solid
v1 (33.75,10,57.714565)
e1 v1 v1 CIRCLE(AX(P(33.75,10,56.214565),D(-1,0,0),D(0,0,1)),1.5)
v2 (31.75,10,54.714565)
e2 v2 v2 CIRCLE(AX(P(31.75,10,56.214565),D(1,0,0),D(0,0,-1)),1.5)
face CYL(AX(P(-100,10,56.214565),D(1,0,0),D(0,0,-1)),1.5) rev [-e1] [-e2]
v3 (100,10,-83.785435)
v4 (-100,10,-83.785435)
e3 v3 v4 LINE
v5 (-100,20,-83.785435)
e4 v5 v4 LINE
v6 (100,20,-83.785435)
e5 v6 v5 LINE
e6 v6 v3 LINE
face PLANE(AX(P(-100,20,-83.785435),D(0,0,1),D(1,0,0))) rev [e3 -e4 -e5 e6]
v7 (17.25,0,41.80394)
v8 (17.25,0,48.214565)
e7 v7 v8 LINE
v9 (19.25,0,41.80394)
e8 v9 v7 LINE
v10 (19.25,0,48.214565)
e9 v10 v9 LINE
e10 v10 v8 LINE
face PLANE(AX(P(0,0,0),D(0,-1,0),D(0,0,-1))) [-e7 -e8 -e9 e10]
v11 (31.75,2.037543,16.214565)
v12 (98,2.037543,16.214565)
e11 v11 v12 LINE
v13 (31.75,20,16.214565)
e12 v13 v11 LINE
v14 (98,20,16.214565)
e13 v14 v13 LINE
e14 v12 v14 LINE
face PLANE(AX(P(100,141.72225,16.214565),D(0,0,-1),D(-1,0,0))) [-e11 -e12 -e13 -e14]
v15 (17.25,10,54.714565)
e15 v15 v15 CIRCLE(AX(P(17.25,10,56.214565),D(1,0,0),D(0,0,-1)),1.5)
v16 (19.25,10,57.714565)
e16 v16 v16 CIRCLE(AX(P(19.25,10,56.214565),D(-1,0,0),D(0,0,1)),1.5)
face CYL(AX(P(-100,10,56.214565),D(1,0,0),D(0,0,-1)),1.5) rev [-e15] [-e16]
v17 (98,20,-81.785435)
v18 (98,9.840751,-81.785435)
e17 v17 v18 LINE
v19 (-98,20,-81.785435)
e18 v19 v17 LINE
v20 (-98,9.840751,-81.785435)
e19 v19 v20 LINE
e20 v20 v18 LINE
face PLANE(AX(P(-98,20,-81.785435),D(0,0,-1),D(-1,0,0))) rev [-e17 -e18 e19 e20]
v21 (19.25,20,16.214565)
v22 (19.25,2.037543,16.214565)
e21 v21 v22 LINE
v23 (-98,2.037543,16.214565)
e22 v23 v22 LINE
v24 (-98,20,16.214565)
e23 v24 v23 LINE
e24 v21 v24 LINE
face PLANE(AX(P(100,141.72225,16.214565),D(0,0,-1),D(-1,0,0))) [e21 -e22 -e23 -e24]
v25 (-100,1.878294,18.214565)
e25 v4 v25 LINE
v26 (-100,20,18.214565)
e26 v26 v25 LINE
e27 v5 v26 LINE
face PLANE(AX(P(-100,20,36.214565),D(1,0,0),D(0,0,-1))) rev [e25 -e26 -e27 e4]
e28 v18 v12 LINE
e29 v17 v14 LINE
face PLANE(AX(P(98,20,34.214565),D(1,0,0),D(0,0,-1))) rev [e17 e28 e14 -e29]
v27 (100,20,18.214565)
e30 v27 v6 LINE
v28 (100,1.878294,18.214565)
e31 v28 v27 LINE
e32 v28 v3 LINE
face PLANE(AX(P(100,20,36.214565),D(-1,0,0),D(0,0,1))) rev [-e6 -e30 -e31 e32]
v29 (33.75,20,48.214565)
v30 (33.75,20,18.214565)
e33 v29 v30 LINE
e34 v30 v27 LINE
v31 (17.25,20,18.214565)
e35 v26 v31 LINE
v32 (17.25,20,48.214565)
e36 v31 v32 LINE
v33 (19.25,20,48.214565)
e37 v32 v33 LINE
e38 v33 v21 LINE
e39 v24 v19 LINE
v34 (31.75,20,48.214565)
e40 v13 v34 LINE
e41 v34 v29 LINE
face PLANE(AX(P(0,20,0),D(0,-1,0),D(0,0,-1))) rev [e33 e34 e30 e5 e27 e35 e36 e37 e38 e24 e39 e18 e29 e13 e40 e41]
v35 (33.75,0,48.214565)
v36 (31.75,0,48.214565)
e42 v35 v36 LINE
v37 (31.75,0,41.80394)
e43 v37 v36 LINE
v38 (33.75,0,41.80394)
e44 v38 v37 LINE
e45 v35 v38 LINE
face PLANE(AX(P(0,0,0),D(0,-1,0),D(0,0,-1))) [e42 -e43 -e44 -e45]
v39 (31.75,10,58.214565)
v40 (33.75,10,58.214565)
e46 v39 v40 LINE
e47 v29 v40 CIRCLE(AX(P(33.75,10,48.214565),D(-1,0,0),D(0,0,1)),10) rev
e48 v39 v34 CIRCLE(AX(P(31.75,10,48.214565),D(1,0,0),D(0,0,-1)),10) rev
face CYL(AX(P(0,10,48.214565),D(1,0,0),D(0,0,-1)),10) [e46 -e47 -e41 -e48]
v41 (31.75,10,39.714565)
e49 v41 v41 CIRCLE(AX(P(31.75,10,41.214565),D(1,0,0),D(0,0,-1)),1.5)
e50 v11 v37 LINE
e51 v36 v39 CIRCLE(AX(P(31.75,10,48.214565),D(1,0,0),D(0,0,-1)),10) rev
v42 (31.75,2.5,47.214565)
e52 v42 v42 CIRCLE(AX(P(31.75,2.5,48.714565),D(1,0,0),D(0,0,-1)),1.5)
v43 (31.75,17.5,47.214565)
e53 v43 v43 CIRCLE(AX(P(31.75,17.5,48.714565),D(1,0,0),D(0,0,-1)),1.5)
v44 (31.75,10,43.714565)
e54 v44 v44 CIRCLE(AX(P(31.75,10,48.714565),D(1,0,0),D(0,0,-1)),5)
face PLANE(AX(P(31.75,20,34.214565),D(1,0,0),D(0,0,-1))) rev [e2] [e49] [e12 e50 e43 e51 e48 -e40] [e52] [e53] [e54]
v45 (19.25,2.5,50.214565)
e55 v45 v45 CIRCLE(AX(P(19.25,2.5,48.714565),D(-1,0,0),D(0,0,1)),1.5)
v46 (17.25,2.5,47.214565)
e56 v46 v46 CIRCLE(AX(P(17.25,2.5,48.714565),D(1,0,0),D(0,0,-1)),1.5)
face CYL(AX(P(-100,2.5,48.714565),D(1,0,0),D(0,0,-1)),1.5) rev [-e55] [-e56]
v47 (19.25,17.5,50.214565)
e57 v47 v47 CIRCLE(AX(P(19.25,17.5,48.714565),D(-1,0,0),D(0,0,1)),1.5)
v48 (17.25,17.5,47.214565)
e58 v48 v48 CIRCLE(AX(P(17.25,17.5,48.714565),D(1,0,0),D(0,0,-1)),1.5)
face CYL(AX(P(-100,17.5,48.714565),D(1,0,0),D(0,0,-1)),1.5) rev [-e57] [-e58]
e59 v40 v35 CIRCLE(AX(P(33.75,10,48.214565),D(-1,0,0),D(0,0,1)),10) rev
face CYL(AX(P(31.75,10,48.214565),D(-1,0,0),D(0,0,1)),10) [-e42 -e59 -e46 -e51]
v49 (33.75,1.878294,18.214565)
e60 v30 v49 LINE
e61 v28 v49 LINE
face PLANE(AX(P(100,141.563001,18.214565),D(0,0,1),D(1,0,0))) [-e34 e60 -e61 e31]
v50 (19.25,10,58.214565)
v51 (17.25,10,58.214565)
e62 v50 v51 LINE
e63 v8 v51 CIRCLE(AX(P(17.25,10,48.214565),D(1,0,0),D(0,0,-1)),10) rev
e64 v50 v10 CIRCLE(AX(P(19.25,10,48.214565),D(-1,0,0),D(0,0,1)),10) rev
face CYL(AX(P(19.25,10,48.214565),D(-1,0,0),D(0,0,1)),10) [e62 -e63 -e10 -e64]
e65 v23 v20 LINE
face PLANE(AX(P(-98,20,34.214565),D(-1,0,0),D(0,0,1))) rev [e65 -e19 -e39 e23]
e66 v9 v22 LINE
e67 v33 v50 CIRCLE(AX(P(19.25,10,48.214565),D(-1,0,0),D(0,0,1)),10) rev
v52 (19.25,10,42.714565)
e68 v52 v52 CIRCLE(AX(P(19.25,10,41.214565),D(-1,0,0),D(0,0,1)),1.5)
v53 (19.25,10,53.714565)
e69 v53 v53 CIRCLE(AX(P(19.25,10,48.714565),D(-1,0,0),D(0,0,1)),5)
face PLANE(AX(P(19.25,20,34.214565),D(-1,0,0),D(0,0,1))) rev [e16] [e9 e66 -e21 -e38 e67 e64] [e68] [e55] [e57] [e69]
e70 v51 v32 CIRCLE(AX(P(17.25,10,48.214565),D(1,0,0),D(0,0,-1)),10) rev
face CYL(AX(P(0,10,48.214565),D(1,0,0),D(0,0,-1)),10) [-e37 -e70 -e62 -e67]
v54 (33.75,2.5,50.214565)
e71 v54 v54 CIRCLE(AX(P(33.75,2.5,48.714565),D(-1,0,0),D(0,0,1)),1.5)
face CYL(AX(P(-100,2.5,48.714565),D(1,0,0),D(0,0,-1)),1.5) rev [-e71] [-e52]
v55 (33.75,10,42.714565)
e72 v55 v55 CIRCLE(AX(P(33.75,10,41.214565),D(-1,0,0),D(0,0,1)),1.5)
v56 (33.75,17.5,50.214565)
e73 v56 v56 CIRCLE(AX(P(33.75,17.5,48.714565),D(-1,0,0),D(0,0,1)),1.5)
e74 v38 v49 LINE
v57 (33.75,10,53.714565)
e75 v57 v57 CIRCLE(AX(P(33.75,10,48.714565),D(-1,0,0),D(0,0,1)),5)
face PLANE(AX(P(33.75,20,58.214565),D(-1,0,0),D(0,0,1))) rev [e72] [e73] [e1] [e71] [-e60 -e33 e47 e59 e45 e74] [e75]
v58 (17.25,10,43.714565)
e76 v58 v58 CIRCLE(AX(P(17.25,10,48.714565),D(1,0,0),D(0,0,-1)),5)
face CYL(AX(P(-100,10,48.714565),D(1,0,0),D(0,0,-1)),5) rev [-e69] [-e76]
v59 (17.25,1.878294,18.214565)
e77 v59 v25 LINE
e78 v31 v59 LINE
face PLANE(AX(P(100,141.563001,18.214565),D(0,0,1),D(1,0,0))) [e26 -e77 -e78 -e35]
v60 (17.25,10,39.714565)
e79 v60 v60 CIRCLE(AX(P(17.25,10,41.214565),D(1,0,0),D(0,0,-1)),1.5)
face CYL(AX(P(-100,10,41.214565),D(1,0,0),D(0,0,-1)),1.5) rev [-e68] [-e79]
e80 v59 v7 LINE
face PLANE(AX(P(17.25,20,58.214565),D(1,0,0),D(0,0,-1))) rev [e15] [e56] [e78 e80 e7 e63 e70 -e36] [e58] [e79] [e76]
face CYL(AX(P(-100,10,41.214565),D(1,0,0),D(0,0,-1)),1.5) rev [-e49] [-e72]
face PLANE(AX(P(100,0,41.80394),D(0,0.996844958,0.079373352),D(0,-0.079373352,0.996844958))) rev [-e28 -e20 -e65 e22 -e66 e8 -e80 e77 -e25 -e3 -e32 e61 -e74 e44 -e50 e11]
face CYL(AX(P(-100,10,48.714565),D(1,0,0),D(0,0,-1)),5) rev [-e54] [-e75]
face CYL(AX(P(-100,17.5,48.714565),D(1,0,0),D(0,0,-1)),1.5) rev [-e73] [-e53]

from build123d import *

# Parameters (mm, degrees)
EXTRUDE_1_DEPTH          = 20
CUT_EXTRUDE_1_DEPTH      = 160.088219443
CUT_EXTRUDE_1_DEPTH_BACK = 160.088219443
SKETCH_6_R               = 5
SKETCH_6_3_R             = 1.5
CUT_EXTRUDE_2_DEPTH      = 160.088219443
PATTERN_CIRCULAR_1_COUNT = 4
FILLET_1_R               = 10
CUT_EXTRUDE_3_DEPTH      = 218.761335102
CUT_EXTRUDE_3_DEPTH_BACK = 218.761335102
EXTRUDE_START            = -98
EXTRUDE_2_DEPTH          = 117.25
EXTRUDE_START_2          = 31.75
EXTRUDE_2_2_DEPTH        = 66.25
EXTRUDE_START_3          = 17.25
EXTRUDE_2_3_DEPTH        = 2
EXTRUDE_2_4_DEPTH        = 2
CUT_EXTRUDE_4_DEPTH      = 132.984844075
CUT_EXTRUDE_4_DEPTH_BACK = 132.984844075
SKETCH_12_W              = 119.060862832
SKETCH_12_H              = 18
SKETCH_12_W_2            = 69.668977306


# Read off the part's stored shape, not the designer's step: 凸台-拉伸2
with BuildPart() as part:
    # 草图2 → 凸台-拉伸1 (new body)
    with BuildSketch(Plane(origin=(0, 0, 0), x_dir=(1, 0, 0), z_dir=(0, 1, 0))):
        Polygon((17.25, -36.214565314), (-100, -36.214565314), (-100, 83.785434686), (100, 83.785434686), (100, -36.214565314), (33.75, -36.214565314), (33.75, -58.214565314), (31.75, -58.214565314), (31.75, -34.214565314), (98, -34.214565314), (98, 81.785434686), (-98, 81.785434686), (-98, -34.214565314), (19.25, -34.214565314), (19.25, -58.214565314), (17.25, -58.214565314), align=None)
    extrude(amount=EXTRUDE_1_DEPTH)

    # 草图6 → 切除-拉伸1 (cut, two sides: drawn at the far end of the back side and taken through both)
    with BuildSketch(Plane(origin=(33.75, 0, 0), x_dir=(0, 0, -1), z_dir=(1, 0, 0)).offset(-CUT_EXTRUDE_1_DEPTH_BACK)):
        with Locations((-48.714565314, 10)):
            Circle(SKETCH_6_R)
    extrude(amount=CUT_EXTRUDE_1_DEPTH + CUT_EXTRUDE_1_DEPTH_BACK, mode=Mode.SUBTRACT)

    # 草图6<3> → 切除-拉伸2 (cut, symmetric)
    with BuildSketch(Plane(origin=(33.75, 0, 0), x_dir=(0, 0, -1), z_dir=(1, 0, 0))):
        with Locations((-48.714565314, 17.5)):
            Circle(SKETCH_6_3_R)
    cut_extrude_2 = extrude(amount=CUT_EXTRUDE_2_DEPTH, both=True, mode=Mode.SUBTRACT)

    # 阵列(圆周)1: 切除-拉伸2 ×4 about axis
    pattern_circular_1_axis = Axis((0, 10, 48.714565314), (1, 0, 0))
    for i in range(1, PATTERN_CIRCULAR_1_COUNT):
        add(cut_extrude_2.rotate(pattern_circular_1_axis, i * 360 / PATTERN_CIRCULAR_1_COUNT), mode=Mode.SUBTRACT)

    # 圆角1
    fillet_1_edges = [part.edges().sort_by_distance(p)[0] for p in [
        (32.75, 20, 58.214565314),
        (32.75, 0, 58.214565314),
        (18.25, 0, 58.214565314),
        (18.25, 20, 58.214565314),
    ]]
    fillet(fillet_1_edges, radius=FILLET_1_R - 0.0001)  # a hair under: the kernel refuses the full size

    # 草图8 → 切除-拉伸3 (cut, two sides: drawn at the far end of the back side and taken through both)
    with BuildSketch(Plane.ZY.offset(100).offset(-CUT_EXTRUDE_3_DEPTH_BACK)):
        Polygon((41.803939726, 0), (-83.785434686, 10), (-83.785434686, 0), align=None)
    extrude(amount=CUT_EXTRUDE_3_DEPTH + CUT_EXTRUDE_3_DEPTH_BACK, mode=Mode.SUBTRACT)

    # 凸台-拉伸2 outline → 凸台-拉伸2 (add)
    with BuildSketch(Plane.YZ.offset(EXTRUDE_START)):
        Polygon((20, 16.214565314), (20, 18.214565314), (1.878293807, 18.214565314), (2.037542948, 16.214565314), align=None)
    extrude(amount=EXTRUDE_2_DEPTH)

    # Extrude 2 2 outline → Extrude 2 2 (add)
    with BuildSketch(Plane.YZ.offset(EXTRUDE_START_2)):
        Polygon((20, 16.214565314), (20, 18.214565314), (1.878293807, 18.214565314), (2.037542948, 16.214565314), align=None)
    extrude(amount=EXTRUDE_2_2_DEPTH)

    # Extrude 2 3 outline → Extrude 2 3 (add)
    with BuildSketch(Plane.YZ.offset(EXTRUDE_START_3)):
        Polygon((20, 18.214565314), (20, 34.214565314), (0.604300678, 34.214565314), (1.878293807, 18.214565314), align=None)
    extrude(amount=EXTRUDE_2_3_DEPTH)

    # Extrude 2 4 outline → Extrude 2 4 (add)
    with BuildSketch(Plane.YZ.offset(EXTRUDE_START_2)):
        Polygon((20, 18.214565314), (20, 34.214565314), (0.604300678, 34.214565314), (1.878293807, 18.214565314), align=None)
    extrude(amount=EXTRUDE_2_4_DEPTH)

    # 草图12 → 切除-拉伸4 (cut, two sides: drawn at the far end of the back side and taken through both)
    with BuildSketch(Plane(origin=(0, 0, 0), x_dir=(1, 0, 0), z_dir=(0, 1, 0)).offset(-CUT_EXTRUDE_4_DEPTH_BACK)):
        with Locations((-42.280431416, -27.214565314)):
            Rectangle(SKETCH_12_W, SKETCH_12_H)
        with Locations((68.584488653, -27.214565314)):
            Rectangle(SKETCH_12_W_2, SKETCH_12_H)
    extrude(amount=CUT_EXTRUDE_4_DEPTH + CUT_EXTRUDE_4_DEPTH_BACK, mode=Mode.SUBTRACT)


solid = part.part
